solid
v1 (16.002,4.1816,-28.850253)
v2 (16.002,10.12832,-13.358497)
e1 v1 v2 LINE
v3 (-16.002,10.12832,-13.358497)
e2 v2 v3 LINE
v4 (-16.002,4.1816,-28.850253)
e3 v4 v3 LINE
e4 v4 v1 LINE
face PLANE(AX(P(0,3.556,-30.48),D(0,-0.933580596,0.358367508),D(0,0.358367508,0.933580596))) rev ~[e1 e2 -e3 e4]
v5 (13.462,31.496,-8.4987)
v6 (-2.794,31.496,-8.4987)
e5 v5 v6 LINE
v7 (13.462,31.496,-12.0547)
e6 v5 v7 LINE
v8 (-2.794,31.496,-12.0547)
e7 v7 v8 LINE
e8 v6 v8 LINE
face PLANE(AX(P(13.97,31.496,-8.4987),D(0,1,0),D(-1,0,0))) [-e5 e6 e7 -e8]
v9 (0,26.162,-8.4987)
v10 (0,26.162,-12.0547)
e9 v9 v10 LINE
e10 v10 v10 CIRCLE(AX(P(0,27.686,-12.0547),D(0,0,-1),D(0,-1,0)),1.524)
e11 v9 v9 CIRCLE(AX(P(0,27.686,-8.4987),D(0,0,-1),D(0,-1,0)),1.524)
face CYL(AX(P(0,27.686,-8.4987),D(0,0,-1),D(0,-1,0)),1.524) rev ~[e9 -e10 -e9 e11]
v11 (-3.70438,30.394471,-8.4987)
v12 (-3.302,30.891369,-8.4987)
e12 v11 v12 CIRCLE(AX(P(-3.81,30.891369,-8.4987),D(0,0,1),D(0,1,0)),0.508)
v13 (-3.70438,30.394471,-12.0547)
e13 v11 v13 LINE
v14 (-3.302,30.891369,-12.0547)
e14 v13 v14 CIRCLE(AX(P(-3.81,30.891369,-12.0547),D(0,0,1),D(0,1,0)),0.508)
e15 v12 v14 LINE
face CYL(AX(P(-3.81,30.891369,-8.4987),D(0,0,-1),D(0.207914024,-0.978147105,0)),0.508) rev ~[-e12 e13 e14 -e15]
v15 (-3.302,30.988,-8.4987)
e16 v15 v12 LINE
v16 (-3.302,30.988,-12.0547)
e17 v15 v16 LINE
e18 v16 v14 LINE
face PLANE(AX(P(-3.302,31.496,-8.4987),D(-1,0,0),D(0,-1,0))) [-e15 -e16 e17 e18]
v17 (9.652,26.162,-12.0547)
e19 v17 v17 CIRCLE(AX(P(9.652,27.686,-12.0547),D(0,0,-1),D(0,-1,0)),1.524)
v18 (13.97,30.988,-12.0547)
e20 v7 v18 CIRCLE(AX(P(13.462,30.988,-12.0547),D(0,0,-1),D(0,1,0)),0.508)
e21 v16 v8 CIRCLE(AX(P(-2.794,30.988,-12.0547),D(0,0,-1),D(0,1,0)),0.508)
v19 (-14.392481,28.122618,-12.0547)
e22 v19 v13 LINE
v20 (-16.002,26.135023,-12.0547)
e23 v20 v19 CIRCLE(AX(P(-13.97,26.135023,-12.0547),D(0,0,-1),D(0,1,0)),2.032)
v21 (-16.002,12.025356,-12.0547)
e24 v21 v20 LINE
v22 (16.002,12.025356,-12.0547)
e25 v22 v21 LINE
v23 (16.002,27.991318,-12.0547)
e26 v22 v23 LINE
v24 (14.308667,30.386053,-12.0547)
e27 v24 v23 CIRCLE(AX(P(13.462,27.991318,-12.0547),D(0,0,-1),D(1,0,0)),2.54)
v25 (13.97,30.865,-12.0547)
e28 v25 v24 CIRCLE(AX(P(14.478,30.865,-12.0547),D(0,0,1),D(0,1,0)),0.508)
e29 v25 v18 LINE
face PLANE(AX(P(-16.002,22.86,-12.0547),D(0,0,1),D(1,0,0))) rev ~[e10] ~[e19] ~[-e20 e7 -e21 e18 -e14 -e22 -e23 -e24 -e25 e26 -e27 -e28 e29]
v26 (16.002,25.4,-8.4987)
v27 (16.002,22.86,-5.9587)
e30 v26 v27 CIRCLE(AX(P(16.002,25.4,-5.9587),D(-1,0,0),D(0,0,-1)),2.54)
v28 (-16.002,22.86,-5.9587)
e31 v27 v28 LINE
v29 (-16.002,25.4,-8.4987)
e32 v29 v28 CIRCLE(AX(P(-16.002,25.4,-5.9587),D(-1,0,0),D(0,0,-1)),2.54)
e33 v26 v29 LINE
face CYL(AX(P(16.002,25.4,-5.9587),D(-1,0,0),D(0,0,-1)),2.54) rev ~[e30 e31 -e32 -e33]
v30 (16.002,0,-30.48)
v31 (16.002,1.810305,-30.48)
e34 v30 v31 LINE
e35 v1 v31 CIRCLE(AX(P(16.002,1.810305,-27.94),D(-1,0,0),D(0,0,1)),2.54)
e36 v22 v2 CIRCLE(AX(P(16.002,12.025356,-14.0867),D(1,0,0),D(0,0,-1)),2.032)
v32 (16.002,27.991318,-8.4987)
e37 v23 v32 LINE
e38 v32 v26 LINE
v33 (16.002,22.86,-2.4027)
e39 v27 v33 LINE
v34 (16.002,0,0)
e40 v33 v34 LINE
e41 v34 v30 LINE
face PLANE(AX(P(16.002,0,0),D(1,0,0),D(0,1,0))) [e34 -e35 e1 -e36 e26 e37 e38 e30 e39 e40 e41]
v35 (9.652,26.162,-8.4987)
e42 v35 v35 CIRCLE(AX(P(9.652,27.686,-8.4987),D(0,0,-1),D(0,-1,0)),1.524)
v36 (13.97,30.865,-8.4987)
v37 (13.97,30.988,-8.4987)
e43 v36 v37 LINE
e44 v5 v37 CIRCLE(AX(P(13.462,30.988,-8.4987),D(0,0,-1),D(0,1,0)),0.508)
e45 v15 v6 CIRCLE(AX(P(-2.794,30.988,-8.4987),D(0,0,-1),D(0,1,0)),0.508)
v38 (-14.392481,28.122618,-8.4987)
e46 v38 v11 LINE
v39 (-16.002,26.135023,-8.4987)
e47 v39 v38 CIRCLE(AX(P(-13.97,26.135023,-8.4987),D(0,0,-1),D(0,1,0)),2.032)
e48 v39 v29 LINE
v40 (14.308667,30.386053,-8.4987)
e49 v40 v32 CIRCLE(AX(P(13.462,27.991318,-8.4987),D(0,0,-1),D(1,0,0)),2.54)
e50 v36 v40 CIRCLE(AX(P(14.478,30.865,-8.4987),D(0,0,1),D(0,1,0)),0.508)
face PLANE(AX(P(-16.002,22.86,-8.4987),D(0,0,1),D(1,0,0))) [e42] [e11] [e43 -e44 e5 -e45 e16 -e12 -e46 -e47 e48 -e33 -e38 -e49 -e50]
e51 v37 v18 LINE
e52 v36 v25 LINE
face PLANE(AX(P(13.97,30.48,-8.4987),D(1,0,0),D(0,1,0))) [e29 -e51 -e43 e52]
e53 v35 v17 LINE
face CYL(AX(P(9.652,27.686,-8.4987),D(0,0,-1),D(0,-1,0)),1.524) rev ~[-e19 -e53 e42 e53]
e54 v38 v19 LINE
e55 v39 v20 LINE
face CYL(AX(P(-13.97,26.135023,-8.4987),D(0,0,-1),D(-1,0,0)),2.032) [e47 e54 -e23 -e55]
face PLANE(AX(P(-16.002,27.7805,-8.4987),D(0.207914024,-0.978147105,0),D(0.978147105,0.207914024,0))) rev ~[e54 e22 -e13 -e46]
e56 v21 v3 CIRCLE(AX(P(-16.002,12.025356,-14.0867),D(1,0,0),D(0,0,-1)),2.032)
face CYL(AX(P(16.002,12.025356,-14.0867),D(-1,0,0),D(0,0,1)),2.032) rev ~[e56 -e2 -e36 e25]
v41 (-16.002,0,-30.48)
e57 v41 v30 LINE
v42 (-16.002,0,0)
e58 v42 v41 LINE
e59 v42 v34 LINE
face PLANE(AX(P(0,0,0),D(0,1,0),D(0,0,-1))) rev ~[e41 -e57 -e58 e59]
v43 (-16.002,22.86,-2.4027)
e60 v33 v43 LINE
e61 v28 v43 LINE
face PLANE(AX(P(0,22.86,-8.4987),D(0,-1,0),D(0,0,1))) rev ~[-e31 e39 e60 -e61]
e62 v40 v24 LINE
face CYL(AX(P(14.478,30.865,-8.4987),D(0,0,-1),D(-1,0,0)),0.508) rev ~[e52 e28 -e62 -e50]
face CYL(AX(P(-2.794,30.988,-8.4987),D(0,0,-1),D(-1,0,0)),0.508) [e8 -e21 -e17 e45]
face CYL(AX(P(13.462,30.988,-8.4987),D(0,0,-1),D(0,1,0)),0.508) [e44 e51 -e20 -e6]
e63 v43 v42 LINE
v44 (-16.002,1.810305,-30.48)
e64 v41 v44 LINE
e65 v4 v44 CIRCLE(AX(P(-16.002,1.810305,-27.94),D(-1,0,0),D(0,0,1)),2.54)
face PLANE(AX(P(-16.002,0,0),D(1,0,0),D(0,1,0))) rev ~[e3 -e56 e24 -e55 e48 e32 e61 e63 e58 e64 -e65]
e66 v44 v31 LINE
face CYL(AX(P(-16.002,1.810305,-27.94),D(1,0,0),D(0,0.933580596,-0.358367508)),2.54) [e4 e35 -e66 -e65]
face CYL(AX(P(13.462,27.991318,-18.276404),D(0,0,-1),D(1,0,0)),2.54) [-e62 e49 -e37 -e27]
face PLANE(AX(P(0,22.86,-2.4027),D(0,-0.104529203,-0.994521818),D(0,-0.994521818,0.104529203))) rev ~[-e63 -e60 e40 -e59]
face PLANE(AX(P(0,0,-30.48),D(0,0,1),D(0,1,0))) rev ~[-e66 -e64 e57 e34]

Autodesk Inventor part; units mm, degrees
ref_plane "YZ Plane" through (0, 0, 0) normal (1, 0, 0) x (0, 1, 0)
ref_plane "XZ Plane" through (0, 0, 0) normal (0, 1, 0) x (-1, 0, 0)
ref_plane "XY Plane" through (0, 0, 0) normal (0, 0, 1) x (1, 0, 0)
sketch "Sketch2" plane through (0, 0, 0) normal (1, 0, 0) x (0, 1, 0)
  line L0 (0, 0) -> (0, -30.48)
  line L1 (0, -30.48) -> (3.556, -30.48)
  line L2 (3.556, -30.48) -> (10.6288, -12.0547)
  line L3 (10.6288, -12.0547) -> (30.48, -12.0547)
  line L4 (30.48, -12.0547) -> (30.48, -8.4987)
  line L5 (30.48, -8.4987) -> (22.86, -8.4987)
  line L6 (22.86, -8.4987) -> (22.86, -2.4027)
  line L7 (22.86, -2.4027) -> (0, 0)
  dimension "d0" = 30.48
  dimension "d1" = 21
  dimension "d2" = 84
  dimension "d3" = 30.48
  dimension "d4" = 22.86
  dimension "d5" = 3.556
  dimension "d6" = 9.652
  dimension "d7" = 3.556
extrude "Extrusion1" add sketch "Sketch2" along normal mid plane 32.004
sketch "Sketch3" plane through (-16.002, 22.86, -8.4987) normal (0, 0, 1) x (1, 0, 0)
  line L0 (0, 7.62) -> (0, -12.2312) projected
  line L1 (0, 7.62) -> (12.7, 7.62)
  line L2 (0, 7.62) -> (32.004, 7.62) projected
  line L3 (0, 4.9205) -> (0, 7.62)
  line L4 (0, 4.9205) -> (12.7, 7.62)
  point P0 (16.002, -22.86)
  dimension "d10" = 12
  dimension "d11" = 12.7
extrude "Extrusion2" cut sketch "Sketch3" against normal blind 32.004
sketch "Sketch4" plane through (-16.002, 22.86, -8.4987) normal (0, 0, 1) x (1, 0, 0)
  line L0 (0, 4.9205) -> (12.7, 7.62) projected
  line L1 (12.7, 7.62) -> (29.972, 7.62)
  line L2 (29.972, 7.62) -> (29.972, 8.636)
  line L3 (29.972, 8.636) -> (12.7, 8.636)
  line L4 (12.7, 8.636) -> (12.7, 7.62)
  line L5 (32.004, 7.62) -> (32.004, 0) projected
  point P0 (16.002, -22.86)
  dimension "d15" = 1.016
  dimension "d18" = 17.272
extrude "Extrusion3" add sketch "Sketch4" against normal up to surface (3.556 mm away)
fillet "Fillet1" radius 2.54 1 edges at (0, 22.86, -8.4987)
fillet "Fillet2" radius 2.032 1 edges at (-16.002, 27.7805, -10.2767)
fillet "Fillet3" radius 2.54 1 edges at (16.002, 30.48, -10.2767)
fillet "Fillet4" radius 2.032 1 edges at (0, 10.6288, -12.0547)
fillet "Fillet4" radius 2.54 1 edges at (0, 3.556, -30.48)
fillet "Fillet4" radius 0.508 4 edges at (13.97, 30.48, -10.2767) (13.97, 31.496, -10.2767) (-3.302, 31.496, -10.2767) (-3.302, 30.48, -10.2767)
sketch "Sketch5" plane through (-16.002, 22.86, -8.4987) normal (0, 0, 1) x (1, 0, 0)
  line L0 (0, 0) -> (32.004, 0) projected
  line L1 (32.004, 7.62) -> (32.004, 0) projected
  point P0 (16.002, -22.86)
  point P1 (16.002, 4.826)
  point P2 (25.654, 4.826)
  dimension "d28" = 9.652
  dimension "d29" = 4.826
  dimension "d30" = 6.35
hole "Hole2" at (0, 27.686, -8.4987) at (9.652, 27.686, -8.4987) direction (0, 0, -1) diameter 3.048 end through all
